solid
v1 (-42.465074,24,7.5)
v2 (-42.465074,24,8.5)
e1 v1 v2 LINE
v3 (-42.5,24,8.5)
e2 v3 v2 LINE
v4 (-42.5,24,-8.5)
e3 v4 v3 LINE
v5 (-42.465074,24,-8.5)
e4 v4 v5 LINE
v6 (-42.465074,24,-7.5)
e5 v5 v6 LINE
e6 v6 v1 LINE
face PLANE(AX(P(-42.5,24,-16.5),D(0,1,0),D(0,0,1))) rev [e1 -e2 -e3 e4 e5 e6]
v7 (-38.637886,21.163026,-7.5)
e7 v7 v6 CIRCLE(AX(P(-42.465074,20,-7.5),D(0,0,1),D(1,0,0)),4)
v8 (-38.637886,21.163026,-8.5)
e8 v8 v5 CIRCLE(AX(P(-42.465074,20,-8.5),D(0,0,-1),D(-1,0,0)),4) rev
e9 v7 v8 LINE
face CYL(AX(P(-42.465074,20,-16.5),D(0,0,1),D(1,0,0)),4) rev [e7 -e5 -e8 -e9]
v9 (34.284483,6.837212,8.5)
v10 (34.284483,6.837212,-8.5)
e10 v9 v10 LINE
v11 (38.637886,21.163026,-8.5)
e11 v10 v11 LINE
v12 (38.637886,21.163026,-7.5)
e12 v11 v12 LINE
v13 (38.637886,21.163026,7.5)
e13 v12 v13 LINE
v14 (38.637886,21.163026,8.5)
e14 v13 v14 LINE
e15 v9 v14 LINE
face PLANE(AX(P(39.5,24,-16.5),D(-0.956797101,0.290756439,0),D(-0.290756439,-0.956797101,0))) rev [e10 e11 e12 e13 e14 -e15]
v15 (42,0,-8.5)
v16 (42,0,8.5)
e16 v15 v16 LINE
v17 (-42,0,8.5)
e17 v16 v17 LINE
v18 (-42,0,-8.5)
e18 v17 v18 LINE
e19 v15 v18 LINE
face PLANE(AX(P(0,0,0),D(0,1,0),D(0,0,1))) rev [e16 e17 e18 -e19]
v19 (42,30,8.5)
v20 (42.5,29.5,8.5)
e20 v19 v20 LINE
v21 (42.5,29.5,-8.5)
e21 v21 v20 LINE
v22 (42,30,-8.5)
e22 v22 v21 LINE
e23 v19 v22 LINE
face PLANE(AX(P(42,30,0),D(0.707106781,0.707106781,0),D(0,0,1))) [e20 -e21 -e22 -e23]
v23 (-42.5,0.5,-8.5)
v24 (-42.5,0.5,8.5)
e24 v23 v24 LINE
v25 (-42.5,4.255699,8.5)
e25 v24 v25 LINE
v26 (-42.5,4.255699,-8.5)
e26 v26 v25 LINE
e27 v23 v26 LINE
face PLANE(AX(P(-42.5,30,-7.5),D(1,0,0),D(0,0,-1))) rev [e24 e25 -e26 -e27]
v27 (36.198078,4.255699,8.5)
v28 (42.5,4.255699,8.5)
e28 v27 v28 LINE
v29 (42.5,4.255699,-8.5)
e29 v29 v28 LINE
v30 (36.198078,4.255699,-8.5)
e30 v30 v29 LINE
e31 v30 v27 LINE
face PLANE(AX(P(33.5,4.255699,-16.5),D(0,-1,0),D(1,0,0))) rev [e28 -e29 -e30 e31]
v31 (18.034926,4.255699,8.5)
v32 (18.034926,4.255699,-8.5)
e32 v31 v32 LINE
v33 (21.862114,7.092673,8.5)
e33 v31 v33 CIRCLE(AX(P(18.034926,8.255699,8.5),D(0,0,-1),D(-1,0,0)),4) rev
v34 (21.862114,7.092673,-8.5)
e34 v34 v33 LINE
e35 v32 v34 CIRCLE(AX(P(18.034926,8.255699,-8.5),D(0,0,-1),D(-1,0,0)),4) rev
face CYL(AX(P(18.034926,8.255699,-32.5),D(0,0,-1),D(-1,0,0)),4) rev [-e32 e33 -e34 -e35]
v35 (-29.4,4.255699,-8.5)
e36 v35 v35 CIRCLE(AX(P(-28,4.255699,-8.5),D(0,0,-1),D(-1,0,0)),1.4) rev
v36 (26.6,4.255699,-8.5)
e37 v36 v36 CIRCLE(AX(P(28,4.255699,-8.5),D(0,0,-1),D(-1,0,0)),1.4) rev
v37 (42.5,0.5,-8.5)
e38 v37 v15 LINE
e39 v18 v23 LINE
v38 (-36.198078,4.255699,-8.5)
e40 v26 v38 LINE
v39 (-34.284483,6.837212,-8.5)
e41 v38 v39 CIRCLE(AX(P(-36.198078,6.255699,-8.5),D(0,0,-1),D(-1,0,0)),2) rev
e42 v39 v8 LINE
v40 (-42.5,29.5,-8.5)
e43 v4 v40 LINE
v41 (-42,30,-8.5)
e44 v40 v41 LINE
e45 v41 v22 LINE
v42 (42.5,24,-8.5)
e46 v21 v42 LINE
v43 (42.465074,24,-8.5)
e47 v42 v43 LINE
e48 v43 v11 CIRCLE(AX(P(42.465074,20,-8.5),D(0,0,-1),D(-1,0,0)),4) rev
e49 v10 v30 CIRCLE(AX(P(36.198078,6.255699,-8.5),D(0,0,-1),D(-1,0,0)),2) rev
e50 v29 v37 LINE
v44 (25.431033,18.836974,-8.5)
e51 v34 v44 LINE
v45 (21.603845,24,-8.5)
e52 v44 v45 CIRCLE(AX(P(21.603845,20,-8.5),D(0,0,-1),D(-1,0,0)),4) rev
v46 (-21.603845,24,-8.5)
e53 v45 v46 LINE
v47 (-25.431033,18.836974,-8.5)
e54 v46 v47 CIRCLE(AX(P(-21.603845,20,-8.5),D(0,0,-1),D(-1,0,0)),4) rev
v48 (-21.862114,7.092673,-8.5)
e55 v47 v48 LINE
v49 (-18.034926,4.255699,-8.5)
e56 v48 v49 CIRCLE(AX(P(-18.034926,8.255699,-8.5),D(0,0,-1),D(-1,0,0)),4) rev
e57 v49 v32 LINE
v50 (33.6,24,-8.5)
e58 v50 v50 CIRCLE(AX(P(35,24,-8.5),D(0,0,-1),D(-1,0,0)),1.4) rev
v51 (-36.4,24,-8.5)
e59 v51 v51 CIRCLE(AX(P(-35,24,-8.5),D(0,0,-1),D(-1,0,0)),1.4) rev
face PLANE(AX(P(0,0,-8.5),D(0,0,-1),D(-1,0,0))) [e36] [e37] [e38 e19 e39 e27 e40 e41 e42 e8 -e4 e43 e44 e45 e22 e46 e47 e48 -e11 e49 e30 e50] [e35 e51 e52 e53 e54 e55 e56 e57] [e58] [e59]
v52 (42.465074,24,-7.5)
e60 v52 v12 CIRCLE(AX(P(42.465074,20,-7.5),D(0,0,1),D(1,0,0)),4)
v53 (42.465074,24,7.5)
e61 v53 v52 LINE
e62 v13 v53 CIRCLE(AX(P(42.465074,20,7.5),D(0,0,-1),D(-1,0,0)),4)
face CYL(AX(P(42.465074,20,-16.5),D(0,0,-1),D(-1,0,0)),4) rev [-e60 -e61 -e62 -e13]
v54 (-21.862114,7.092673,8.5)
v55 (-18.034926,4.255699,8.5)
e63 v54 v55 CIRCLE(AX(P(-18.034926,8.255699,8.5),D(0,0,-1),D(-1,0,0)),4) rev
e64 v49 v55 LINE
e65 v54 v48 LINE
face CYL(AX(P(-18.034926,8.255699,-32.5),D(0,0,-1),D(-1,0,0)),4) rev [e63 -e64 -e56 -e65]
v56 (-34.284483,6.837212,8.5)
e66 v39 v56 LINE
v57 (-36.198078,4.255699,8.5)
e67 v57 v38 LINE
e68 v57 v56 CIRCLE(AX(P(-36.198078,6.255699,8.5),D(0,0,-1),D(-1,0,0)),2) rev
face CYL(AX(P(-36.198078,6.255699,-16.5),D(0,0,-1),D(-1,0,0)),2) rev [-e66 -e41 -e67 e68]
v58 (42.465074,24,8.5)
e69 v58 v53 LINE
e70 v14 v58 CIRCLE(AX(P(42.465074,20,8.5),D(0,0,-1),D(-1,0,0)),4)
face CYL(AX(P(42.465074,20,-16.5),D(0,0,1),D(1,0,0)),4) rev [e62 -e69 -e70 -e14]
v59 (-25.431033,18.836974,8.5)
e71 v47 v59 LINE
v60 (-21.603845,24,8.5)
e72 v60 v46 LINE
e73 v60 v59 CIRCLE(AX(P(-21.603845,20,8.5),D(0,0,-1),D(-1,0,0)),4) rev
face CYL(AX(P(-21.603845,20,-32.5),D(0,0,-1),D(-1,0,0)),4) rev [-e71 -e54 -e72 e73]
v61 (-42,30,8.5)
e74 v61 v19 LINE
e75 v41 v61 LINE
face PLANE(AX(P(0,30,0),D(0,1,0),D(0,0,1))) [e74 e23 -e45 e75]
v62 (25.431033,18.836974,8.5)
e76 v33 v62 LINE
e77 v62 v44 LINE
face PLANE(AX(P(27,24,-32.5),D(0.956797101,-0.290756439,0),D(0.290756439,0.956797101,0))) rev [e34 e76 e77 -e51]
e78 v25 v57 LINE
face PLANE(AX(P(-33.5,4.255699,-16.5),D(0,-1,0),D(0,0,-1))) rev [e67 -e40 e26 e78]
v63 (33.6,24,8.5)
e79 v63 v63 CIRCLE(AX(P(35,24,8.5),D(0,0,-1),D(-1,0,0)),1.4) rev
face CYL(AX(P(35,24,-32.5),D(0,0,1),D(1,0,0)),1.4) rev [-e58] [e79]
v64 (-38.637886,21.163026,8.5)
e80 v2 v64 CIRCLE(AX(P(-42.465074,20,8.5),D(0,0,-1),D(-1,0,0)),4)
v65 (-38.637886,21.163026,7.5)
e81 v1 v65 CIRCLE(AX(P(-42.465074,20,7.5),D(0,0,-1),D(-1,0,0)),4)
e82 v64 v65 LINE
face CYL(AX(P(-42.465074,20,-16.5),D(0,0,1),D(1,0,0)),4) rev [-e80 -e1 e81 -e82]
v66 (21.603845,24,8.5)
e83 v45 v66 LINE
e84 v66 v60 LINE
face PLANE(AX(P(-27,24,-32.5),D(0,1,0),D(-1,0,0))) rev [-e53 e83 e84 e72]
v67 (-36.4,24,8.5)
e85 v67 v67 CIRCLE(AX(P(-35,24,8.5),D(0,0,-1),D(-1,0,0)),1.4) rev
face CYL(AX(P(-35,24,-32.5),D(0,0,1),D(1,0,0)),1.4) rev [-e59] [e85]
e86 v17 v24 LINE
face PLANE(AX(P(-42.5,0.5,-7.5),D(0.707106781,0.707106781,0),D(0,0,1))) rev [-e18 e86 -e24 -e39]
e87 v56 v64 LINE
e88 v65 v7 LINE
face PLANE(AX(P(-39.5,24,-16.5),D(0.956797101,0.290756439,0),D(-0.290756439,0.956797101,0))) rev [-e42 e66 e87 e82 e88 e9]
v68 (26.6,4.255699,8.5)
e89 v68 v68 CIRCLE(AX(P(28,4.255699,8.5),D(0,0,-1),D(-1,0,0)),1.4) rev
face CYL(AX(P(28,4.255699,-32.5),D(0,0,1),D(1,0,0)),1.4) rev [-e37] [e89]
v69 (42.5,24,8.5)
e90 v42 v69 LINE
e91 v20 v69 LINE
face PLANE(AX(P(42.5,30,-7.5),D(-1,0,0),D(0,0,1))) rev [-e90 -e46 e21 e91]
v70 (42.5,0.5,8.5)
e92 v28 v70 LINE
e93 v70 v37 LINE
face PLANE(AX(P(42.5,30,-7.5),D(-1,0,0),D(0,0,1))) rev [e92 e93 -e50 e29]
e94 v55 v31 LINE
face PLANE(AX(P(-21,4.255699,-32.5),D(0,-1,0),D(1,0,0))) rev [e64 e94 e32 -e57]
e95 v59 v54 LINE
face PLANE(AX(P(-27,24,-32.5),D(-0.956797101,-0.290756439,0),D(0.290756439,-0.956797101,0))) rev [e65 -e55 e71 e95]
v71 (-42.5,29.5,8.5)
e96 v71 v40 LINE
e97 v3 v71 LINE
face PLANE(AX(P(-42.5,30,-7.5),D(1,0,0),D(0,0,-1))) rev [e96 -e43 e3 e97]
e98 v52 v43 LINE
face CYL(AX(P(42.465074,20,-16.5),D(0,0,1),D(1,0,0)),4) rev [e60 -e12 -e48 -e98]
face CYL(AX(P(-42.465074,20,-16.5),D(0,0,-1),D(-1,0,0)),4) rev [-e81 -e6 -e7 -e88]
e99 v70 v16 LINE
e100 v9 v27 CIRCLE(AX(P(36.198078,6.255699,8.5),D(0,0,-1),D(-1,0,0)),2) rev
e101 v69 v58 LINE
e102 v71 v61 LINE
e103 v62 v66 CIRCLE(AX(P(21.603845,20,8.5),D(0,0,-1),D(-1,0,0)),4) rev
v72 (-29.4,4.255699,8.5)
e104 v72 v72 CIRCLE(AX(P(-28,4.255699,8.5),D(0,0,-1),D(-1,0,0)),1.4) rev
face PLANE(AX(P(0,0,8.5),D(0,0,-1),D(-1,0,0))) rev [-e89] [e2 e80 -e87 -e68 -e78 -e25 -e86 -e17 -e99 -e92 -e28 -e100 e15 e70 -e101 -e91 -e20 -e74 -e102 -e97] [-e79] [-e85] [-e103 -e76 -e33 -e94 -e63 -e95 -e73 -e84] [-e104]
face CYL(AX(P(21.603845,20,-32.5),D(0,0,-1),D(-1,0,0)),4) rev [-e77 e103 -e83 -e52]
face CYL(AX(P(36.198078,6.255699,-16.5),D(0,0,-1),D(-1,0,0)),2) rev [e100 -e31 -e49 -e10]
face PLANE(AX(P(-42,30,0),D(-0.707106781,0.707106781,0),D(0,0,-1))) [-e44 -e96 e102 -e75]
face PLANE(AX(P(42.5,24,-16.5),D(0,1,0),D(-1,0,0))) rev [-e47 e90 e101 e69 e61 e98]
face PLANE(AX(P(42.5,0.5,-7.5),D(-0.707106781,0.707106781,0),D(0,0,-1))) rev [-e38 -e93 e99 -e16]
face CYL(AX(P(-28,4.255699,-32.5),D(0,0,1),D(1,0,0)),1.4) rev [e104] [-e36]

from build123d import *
from build123d.topology import SkipClean

# Parameters (mm, degrees)
SKETCH_1_W           = 85
SKETCH_1_H           = 15
EXTRUDE_1_DEPTH      = 30
SKETCH_2_R           = 1.4
CUT_EXTRUDE_1_DEPTH  = 40
CUT_EXTRUDE_2_DEPTH  = 40
FILLET_1_R           = 4
SKETCH_5_R           = 1.8
CUT_EXTRUDE_3_DEPTH  = 5
CHAMFER_1_SIZE       = 0.5
CUT_EXTRUDE_4_DEPTH  = 24
FILLET_3_R           = 4
CUT_EXTRUDE_START    = -5
SKETCH_9_R           = 1.8
CUT_EXTRUDE_5_DEPTH  = 5
FILLET_4_R           = 2
EXTRUDE_3_DEPTH      = 1
EXTRUDE_3_DEPTH_BACK = 16
SKETCH_10_R          = 1.4
FILLET_START         = -8.5
FILLET_5_DEPTH       = 17


with BuildPart() as part:
    # 草图1 → 凸台-拉伸1 (new body)
    with BuildSketch(Plane(origin=(0, 0, 0), x_dir=(1, 0, 0), z_dir=(0, 1, 0))):
        Rectangle(SKETCH_1_W, SKETCH_1_H)
    extrude(amount=EXTRUDE_1_DEPTH)

    # 草图2 → 切除-拉伸1 (cut)
    with BuildSketch(Plane.XY.offset(7.5)):
        with Locations((-35, 24)):
            Circle(SKETCH_2_R)
        with Locations((35, 24)):
            Circle(SKETCH_2_R)
        with Locations((28, 4.255699158)):
            Circle(SKETCH_2_R)
        with Locations((-28, 4.255699158)):
            Circle(SKETCH_2_R)
    extrude(amount=-CUT_EXTRUDE_1_DEPTH, mode=Mode.SUBTRACT)

    # 草图3 → 切除-拉伸2 (cut)
    with BuildSketch(Plane.XY.offset(7.5)):
        Polygon((-27, 24), (27, 24), (21, 4.255699158), (-21, 4.255699158), align=None)
    extrude(amount=-CUT_EXTRUDE_2_DEPTH, mode=Mode.SUBTRACT)

    # 圆角1
    fillet_1_edges = [part.edges().sort_by_distance(p)[0] for p in [
        (-21, 4.255699158, 0),
        (-27, 24, 0),
        (27, 24, 0),
        (21, 4.255699158, 0),
    ]]
    fillet(fillet_1_edges, radius=FILLET_1_R)

    # 草图5 → 切除-拉伸3 (cut)
    with BuildSketch(Plane(origin=(0, 30, 0), x_dir=(1, 0, 0), z_dir=(0, 1, 0))):
        with Locations(Location((-35, 4.5, 0), (0, 0, 270))):
            Circle(SKETCH_5_R)
        with Locations(Location((35, 4.5, 0), (0, 0, 270))):
            Circle(SKETCH_5_R)
        with Locations(Location((-20, -4.5, 0), (0, 0, 270))):
            Circle(SKETCH_5_R)
        with Locations(Location((20, -4.5, 0), (0, 0, 270))):
            Circle(SKETCH_5_R)
    extrude(amount=-CUT_EXTRUDE_3_DEPTH, mode=Mode.SUBTRACT)

    # 倒角1
    chamfer_1_edges = [part.edges().sort_by_distance(p)[0] for p in [
        (-42.5, 30, 0),
        (42.5, 30, 0),
        (-42.5, 0, 0),
        (42.5, 0, 0),
    ]]
    chamfer(chamfer_1_edges, length=CHAMFER_1_SIZE)

    # 草图6 → 切除-拉伸4 (cut)
    with BuildSketch(Plane.XY.offset(7.5)):
        Polygon((-42.5, 24), (-39.5, 24), (-33.5, 4.255699158), (-42.5, 4.255699158), align=None)
        Polygon((42.5, 24), (42.5, 4.255699158), (33.5, 4.255699158), (39.5, 24), align=None)
    extrude(amount=-CUT_EXTRUDE_4_DEPTH, mode=Mode.SUBTRACT)

    # 圆角3
    fillet_3_edges = [part.edges().sort_by_distance(p)[0] for p in [
        (-39.5, 24, 0),
        (39.5, 24, 0),
    ]]
    fillet(fillet_3_edges, radius=FILLET_3_R)

    # 草图9 → 切除-拉伸5 (cut)
    with BuildSketch(Plane.XZ.offset(CUT_EXTRUDE_START)):
        with Locations(Location((20, 4.5, 0), (0, 0, 90))):
            Circle(SKETCH_9_R)
        with Locations(Location((-20, 4.5, 0), (0, 0, 90))):
            Circle(SKETCH_9_R)
        with Locations(Location((-35, -4.5, 0), (0, 0, 90))):
            Circle(SKETCH_9_R)
        with Locations(Location((35, -4.5, 0), (0, 0, 90))):
            Circle(SKETCH_9_R)
    extrude(amount=CUT_EXTRUDE_5_DEPTH, mode=Mode.SUBTRACT)

    # 圆角4
    # the kernel refuses this fillet: 2 mm, written as the material it adds along each edge
    with BuildSketch(Plane(origin=(-33.5, 4.255699158, 7.5), x_dir=(-1, 0, 0), z_dir=(0, 0, -1))) as fillet_4_piece_1_section:
        with BuildLine():
            CenterArc((FILLET_4_R * 1.34903882702, FILLET_4_R), FILLET_4_R, 163.096751643, 106.903248357)
            Line((FILLET_4_R * 0.392241725729, FILLET_4_R * 1.29075643923), (0, 0))
            Line((0, 0), (FILLET_4_R * 1.34903882702, 0))
        make_face()
    fillet_4_piece_1 = extrude(amount=17.750206698, mode=Mode.PRIVATE)
    fillet_4_piece_1 = split(fillet_4_piece_1, bisect_by=Plane(origin=(-33.5, 4.255699158, -7.5), z_dir=(0, 0, 1)), keep=Keep.TOP, mode=Mode.PRIVATE)
    fillet_4_piece_1 = fillet_4_piece_1 - Plane(origin=(-35, 4.255699158, -4.5), x_dir=(0, 0, 1), z_dir=(0, 1, 0)) * Cylinder(1.8, 47, mode=Mode.PRIVATE)
    add(fillet_4_piece_1)
    with BuildSketch(Plane(origin=(-33.5, 4.255699158, 7.5), x_dir=(-1, 0, 0), z_dir=(0, 0, -1))) as fillet_4_piece_2_section:
        with BuildLine():
            CenterArc((FILLET_4_R * 1.34903882702, FILLET_4_R), FILLET_4_R, 163.096751643, 106.903248357)
            Line((FILLET_4_R * 0.392241725729, FILLET_4_R * 1.29075643923), (0, 0))
            Line((0, 0), (FILLET_4_R * 1.34903882702, 0))
        make_face()
    fillet_4_piece_2 = extrude(amount=17.750206698, mode=Mode.PRIVATE)
    fillet_4_piece_2 = split(fillet_4_piece_2, bisect_by=Plane(origin=(-33.5, 4.255699158, -7.5), z_dir=(0, 0, 1)), keep=Keep.TOP, mode=Mode.PRIVATE)
    fillet_4_piece_2 = split(fillet_4_piece_2, bisect_by=Plane(origin=(-33.5, 5, 7.5), z_dir=(0, 1, 0)), keep=Keep.TOP, mode=Mode.PRIVATE)
    add(fillet_4_piece_2)
    with BuildSketch(Plane(origin=(33.5, 4.255699158, 7.5), x_dir=(0.2907564392301515, 0.9567971012948373, 0), z_dir=(0, 0, -1))) as fillet_4_piece_3_section:
        with BuildLine():
            CenterArc((FILLET_4_R * 1.34903882702, FILLET_4_R), FILLET_4_R, 163.096751643, 106.903248357)
            Line((FILLET_4_R * 0.392241725729, FILLET_4_R * 1.29075643923), (0, 0))
            Line((0, 0), (FILLET_4_R * 1.34903882702, 0))
        make_face()
    fillet_4_piece_3 = extrude(amount=17.750206698, mode=Mode.PRIVATE)
    fillet_4_piece_3 = split(fillet_4_piece_3, bisect_by=Plane(origin=(33.5, 4.255699158, -7.5), z_dir=(0, 0, 1)), keep=Keep.TOP, mode=Mode.PRIVATE)
    fillet_4_piece_3 = fillet_4_piece_3 - Plane(origin=(35, 4.255699158, -4.5), x_dir=(0, 0, 1), z_dir=(0, 1, 0)) * Cylinder(1.8, 47, mode=Mode.PRIVATE)
    add(fillet_4_piece_3)
    with BuildSketch(Plane(origin=(33.5, 4.255699158, 7.5), x_dir=(0.2907564392301515, 0.9567971012948373, 0), z_dir=(0, 0, -1))) as fillet_4_piece_4_section:
        with BuildLine():
            CenterArc((FILLET_4_R * 1.34903882702, FILLET_4_R), FILLET_4_R, 163.096751643, 106.903248357)
            Line((FILLET_4_R * 0.392241725729, FILLET_4_R * 1.29075643923), (0, 0))
            Line((0, 0), (FILLET_4_R * 1.34903882702, 0))
        make_face()
    fillet_4_piece_4 = extrude(amount=17.750206698, mode=Mode.PRIVATE)
    fillet_4_piece_4 = split(fillet_4_piece_4, bisect_by=Plane(origin=(33.5, 4.255699158, -7.5), z_dir=(0, 0, 1)), keep=Keep.TOP, mode=Mode.PRIVATE)
    fillet_4_piece_4 = split(fillet_4_piece_4, bisect_by=Plane(origin=(33.5, 5, 7.5), z_dir=(0, 1, 0)), keep=Keep.TOP, mode=Mode.PRIVATE)
    add(fillet_4_piece_4)

    # 草图10 → 凸台-拉伸3 (add, two sides: drawn at the far end of the back side and taken through both)
    with SkipClean():  # the faces are left unmerged after this step: merging them gives an invalid solid
        with BuildSketch(Plane(origin=(0, 0, -7.5), x_dir=(-1, 0, 0), z_dir=(0, 0, -1)).offset(-EXTRUDE_3_DEPTH_BACK)):
            with BuildLine():
                Line((42.5, 29.5), (42, 30))
                Line((42, 30), (-42, 30))
                Line((-42, 30), (-42.5, 29.5))
                Line((-42.5, 29.5), (-42.5, 24))
                Line((-42.5, 24), (-39.5, 24))
                Line((-39.5, 24), (-38.637885631, 21.163025757))
                Line((-38.637885631, 21.163025757), (-34.284483451, 6.837212037))
                ThreePointArc((-34.284483451, 6.837212037), (-34.591368944, 5.064696589), (-36.198077654, 4.255699158))
                Line((-36.198077654, 4.255699158), (-42.5, 4.255699158))
                Line((-42.5, 4.255699158), (-42.5, 0.5))
                Line((-42.5, 0.5), (-42, 0))
                Line((-42, 0), (42, 0))
                Line((42, 0), (42.5, 0.5))
                Line((42.5, 0.5), (42.5, 4.255699158))
                Line((42.5, 4.255699158), (36.198077654, 4.255699158))
                ThreePointArc((36.198077654, 4.255699158), (34.591368944, 5.064696589), (34.284483451, 6.837212037))
                Line((34.284483451, 6.837212037), (38.637885631, 21.163025757))
                Line((38.637885631, 21.163025757), (39.5, 24))
                Line((39.5, 24), (42.5, 24))
                Line((42.5, 24), (42.5, 29.5))
            make_face()
            with Locations((-28, 4.255699158)):
                Circle(SKETCH_10_R, mode=Mode.SUBTRACT)
            with Locations((28, 4.255699158)):
                Circle(SKETCH_10_R, mode=Mode.SUBTRACT)
            with BuildLine():
                Line((-21.603844692, 24), (21.603844692, 24))
                ThreePointArc((21.603844692, 24), (24.817262112, 22.38200514), (25.431033097, 18.836974243))
                Line((25.431033097, 18.836974243), (21.862114369, 7.092673402))
                ThreePointArc((21.862114369, 7.092673402), (20.416931104, 5.042281739), (18.034925964, 4.255699158))
                Line((18.034925964, 4.255699158), (-18.034925964, 4.255699158))
                ThreePointArc((-18.034925964, 4.255699158), (-20.416931104, 5.042281739), (-21.862114369, 7.092673402))
                Line((-21.862114369, 7.092673402), (-25.431033097, 18.836974243))
                ThreePointArc((-25.431033097, 18.836974243), (-24.817262112, 22.38200514), (-21.603844692, 24))
            make_face(mode=Mode.SUBTRACT)
            with Locations((-35, 24)):
                Circle(SKETCH_10_R, mode=Mode.SUBTRACT)
            with Locations((35, 24)):
                Circle(SKETCH_10_R, mode=Mode.SUBTRACT)
        extrude(amount=EXTRUDE_3_DEPTH + EXTRUDE_3_DEPTH_BACK)
    add(part.part.scale(1), mode=Mode.REPLACE)  # the faces are merged on a copy

    # 圆角5: read off the stored shape, not the designer's step
    # 圆角5 outline → 圆角5 (add)
    with BuildSketch(Plane.XY.offset(FILLET_START)):
        with BuildLine():
            ThreePointArc((-42.465074036, 24), (-40.083068896, 23.21341742), (-38.637885631, 21.163025757))
            Line((-38.637885631, 21.163025757), (-39.5, 24))
            Line((-39.5, 24), (-42.465074036, 24))
        make_face()
        with BuildLine():
            ThreePointArc((38.637885631, 21.163025757), (40.083068896, 23.21341742), (42.465074036, 24))
            Line((42.465074036, 24), (39.5, 24))
            Line((39.5, 24), (38.637885631, 21.163025757))
        make_face()
    extrude(amount=FILLET_5_DEPTH)


solid = part.part
